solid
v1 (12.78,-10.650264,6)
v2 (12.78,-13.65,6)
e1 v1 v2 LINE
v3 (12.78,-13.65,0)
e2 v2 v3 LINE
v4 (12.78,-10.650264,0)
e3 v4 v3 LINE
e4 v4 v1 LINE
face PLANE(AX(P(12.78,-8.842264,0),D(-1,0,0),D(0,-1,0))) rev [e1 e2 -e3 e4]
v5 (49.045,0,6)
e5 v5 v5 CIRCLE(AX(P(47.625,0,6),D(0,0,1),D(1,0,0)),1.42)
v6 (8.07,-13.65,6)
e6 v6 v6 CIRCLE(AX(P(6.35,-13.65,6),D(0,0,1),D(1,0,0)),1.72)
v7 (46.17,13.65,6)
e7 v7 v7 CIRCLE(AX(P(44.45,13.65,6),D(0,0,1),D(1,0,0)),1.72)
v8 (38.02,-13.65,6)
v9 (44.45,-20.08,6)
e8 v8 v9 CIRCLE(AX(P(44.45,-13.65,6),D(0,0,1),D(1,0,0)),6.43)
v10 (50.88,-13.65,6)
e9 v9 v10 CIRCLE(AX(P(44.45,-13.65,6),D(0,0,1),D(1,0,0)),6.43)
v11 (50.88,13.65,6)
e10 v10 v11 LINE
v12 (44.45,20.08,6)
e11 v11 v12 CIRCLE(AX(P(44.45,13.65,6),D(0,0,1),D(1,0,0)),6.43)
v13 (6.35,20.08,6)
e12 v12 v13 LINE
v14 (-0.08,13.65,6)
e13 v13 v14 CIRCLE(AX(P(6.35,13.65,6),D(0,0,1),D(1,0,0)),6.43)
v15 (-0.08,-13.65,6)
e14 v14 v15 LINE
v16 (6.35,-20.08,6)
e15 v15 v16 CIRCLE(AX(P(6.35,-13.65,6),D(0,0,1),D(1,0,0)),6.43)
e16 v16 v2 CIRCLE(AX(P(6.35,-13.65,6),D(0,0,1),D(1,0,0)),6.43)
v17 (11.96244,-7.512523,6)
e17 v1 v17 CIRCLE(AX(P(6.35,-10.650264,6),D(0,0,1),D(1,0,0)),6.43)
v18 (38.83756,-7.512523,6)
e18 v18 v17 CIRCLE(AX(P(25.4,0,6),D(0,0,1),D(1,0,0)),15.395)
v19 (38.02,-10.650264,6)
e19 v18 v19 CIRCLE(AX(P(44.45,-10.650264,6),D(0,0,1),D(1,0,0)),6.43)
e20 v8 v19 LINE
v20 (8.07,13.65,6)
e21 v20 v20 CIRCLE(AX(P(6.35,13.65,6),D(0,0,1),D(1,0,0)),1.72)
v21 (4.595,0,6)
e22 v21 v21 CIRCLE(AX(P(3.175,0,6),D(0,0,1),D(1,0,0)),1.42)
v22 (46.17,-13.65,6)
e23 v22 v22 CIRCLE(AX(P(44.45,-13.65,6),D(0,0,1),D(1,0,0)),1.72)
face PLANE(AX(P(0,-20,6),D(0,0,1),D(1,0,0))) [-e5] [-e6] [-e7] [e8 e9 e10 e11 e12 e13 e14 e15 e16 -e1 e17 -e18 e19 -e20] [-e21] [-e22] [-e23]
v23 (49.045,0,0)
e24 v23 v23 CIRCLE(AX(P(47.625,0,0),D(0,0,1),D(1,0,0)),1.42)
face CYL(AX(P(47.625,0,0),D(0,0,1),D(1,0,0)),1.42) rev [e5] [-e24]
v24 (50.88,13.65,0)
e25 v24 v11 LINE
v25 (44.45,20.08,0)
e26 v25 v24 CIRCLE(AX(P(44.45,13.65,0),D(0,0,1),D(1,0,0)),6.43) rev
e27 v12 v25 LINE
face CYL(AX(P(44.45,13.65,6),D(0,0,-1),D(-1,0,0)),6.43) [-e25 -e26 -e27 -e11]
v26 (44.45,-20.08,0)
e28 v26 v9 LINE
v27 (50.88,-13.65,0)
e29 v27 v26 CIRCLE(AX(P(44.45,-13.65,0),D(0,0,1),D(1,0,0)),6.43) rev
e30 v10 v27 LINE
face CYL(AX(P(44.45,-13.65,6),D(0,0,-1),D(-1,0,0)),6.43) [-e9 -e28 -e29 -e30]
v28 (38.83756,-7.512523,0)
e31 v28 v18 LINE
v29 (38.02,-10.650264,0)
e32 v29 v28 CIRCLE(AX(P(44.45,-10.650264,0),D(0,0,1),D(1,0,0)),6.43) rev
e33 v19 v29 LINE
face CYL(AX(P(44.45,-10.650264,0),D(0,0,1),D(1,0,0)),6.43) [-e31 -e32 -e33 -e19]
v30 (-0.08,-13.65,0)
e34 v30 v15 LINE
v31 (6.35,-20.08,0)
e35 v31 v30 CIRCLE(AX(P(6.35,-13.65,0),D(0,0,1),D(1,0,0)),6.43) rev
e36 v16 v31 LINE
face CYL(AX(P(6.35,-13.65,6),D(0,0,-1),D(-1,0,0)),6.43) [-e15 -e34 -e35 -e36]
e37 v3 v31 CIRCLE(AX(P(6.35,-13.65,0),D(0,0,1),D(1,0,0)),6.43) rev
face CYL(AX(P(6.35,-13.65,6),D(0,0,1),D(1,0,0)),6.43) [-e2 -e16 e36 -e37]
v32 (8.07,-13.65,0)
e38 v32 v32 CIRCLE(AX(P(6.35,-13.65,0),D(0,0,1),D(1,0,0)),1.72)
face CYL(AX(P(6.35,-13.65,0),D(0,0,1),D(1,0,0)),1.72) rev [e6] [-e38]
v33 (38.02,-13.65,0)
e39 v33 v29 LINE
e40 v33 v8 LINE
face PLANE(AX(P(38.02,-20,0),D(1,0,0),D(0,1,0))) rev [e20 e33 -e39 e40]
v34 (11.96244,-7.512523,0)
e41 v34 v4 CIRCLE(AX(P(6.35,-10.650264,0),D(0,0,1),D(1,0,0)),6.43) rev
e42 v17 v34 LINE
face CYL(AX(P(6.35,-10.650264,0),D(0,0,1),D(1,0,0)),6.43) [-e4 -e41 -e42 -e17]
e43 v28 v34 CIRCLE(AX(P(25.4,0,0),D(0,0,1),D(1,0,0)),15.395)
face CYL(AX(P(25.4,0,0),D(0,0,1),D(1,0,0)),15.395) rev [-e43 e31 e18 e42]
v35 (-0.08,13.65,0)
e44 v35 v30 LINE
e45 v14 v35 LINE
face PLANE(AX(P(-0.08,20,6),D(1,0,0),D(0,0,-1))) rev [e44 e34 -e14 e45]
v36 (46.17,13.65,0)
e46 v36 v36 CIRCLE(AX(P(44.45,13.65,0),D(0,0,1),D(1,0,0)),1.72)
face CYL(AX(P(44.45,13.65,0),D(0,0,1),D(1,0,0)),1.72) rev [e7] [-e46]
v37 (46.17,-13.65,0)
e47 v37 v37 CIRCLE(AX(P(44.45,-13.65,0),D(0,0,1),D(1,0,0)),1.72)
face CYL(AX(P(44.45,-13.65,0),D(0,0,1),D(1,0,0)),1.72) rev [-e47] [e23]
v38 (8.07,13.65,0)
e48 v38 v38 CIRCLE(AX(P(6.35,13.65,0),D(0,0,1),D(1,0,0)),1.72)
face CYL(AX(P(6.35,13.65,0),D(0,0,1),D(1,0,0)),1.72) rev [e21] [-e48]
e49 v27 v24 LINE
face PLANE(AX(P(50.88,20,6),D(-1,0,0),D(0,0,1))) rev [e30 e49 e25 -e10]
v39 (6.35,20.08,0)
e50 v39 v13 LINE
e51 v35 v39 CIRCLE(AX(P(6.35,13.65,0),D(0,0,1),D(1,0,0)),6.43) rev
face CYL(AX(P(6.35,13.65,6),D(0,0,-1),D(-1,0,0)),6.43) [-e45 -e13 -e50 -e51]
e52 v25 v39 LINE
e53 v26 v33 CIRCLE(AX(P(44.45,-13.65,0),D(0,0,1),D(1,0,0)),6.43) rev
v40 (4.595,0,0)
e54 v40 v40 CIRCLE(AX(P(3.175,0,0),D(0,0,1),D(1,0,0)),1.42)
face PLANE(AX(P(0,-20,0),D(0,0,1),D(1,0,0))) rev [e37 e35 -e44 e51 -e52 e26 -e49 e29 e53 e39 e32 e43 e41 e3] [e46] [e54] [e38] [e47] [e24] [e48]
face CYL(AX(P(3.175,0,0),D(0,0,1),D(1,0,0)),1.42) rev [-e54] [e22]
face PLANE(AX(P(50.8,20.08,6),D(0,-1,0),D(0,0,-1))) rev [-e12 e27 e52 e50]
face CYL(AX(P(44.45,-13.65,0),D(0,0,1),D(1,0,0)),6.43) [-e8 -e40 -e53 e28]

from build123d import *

# Parameters (mm, degrees)
SKETCH1_W              = 50.8
SKETCH1_H              = 40
BOSS_EXTRUDE1_DEPTH    = 6
SKETCH10_R             = 1.8
M3_THROUGH_DEPTH       = 55.923947418
CUT_EXTRUDE2_DEPTH     = 55.923947418
FILLET1_R              = 6.35
SKETCH8_R              = 1.5
CUT_EXTRUDE1_DEPTH     = 55.923947418
MOVE_FACE1_OUTLINE_R   = 1.8
MOVE_FACE1_OUTLINE_R_2 = 1.72
MOVE_FACE1_OUTLINE_R_3 = 1.5
MOVE_FACE1_OUTLINE_R_4 = 1.42
MOVE_FACE1_DEPTH       = 6


# Read off the part's stored shape, not the designer's step: Move Face1
with BuildPart() as part:
    # Sketch1 → Boss-Extrude1 (new body)
    with BuildSketch(Plane.XY):
        with Locations((25.4, 0)):
            Rectangle(SKETCH1_W, SKETCH1_H)
    extrude(amount=BOSS_EXTRUDE1_DEPTH)

    # Sketch10 → M3-through (cut, through all)
    with BuildSketch(Plane.XY.offset(6)):
        with Locations((44.45, 13.65)):
            Circle(SKETCH10_R)
        with Locations(Location((44.45, -13.65, 0), (0, 0, 180))):
            Circle(SKETCH10_R)
        with Locations((6.35, -13.65)):
            Circle(SKETCH10_R)
        with Locations(Location((6.35, 13.65, 0), (0, 0, 180))):
            Circle(SKETCH10_R)
    extrude(amount=-M3_THROUGH_DEPTH, mode=Mode.SUBTRACT)

    # Sketch9 → Cut-Extrude2 (cut, through all)
    with BuildSketch(Plane.XY.offset(6)):
        with BuildLine():
            Line((12.7, -8.842263568), (12.7, -20))
            Line((12.7, -20), (38.1, -20))
            Line((38.1, -20), (38.1, -8.842263568))
            ThreePointArc((38.1, -8.842263568), (25.4, 15.475), (12.7, -8.842263568))
        make_face()
    extrude(amount=-CUT_EXTRUDE2_DEPTH, mode=Mode.SUBTRACT)

    # Fillet1
    fillet1_edges = [part.edges().sort_by_distance(p)[0] for p in [
        (0, -20, 3),
        (50.8, -20, 3),
        (50.8, 20, 3),
        (0, 20, 3),
        (38.1, -20, 3),
        (38.1, -8.842263568, 3),
        (12.7, -8.842263568, 3),
        (12.7, -20, 3),
    ]]
    fillet(fillet1_edges, radius=FILLET1_R - 0.0001)  # a hair under: the kernel refuses the full size

    # Sketch8 → Cut-Extrude1 (cut, through all)
    with BuildSketch(Plane.XY.offset(6)):
        with Locations((47.625, 0)):
            Circle(SKETCH8_R)
        with Locations((3.175, 0)):
            Circle(SKETCH8_R)
    extrude(amount=-CUT_EXTRUDE1_DEPTH, mode=Mode.SUBTRACT)

    # Move Face1 outline → Move Face1 (add)
    # profile 1 of 7: a face of its own
    with BuildSketch(Plane.XY):
        with BuildLine():
            Line((-0.08, 13.65), (-0.08, -13.65))
            ThreePointArc((-0.08, -13.65), (1.803303397, -18.196696603), (6.35, -20.08))
            ThreePointArc((6.35, -20.08), (10.896696603, -18.196696603), (12.78, -13.65))
            Line((12.78, -13.65), (12.78, -10.650264081))
            ThreePointArc((12.78, -10.650264081), (12.572253945, -9.029012761), (11.962439863, -7.512523048))
            ThreePointArc((11.962439863, -7.512523048), (25.4, 15.395), (38.837560137, -7.512523048))
            ThreePointArc((38.837560137, -7.512523048), (38.227746055, -9.029012761), (38.02, -10.650264081))
            Line((38.02, -10.650264081), (38.02, -13.65))
            ThreePointArc((38.02, -13.65), (39.903303397, -18.196696603), (44.45, -20.08))
            ThreePointArc((44.45, -20.08), (48.996696603, -18.196696603), (50.88, -13.65))
            Line((50.88, -13.65), (50.88, 13.65))
            ThreePointArc((50.88, 13.65), (48.996696603, 18.196696603), (44.45, 20.08))
            Line((44.45, 20.08), (6.35, 20.08))
            ThreePointArc((6.35, 20.08), (1.803303397, 18.196696603), (-0.08, 13.65))
        make_face()
        with BuildLine():
            ThreePointArc((6.35, -20), (1.859871939, -18.140128061), (0, -13.65))
            Line((0, -13.65), (0, 13.65))
            ThreePointArc((0, 13.65), (1.859871939, 18.140128061), (6.35, 20))
            Line((6.35, 20), (44.45, 20))
            ThreePointArc((44.45, 20), (48.940128061, 18.140128061), (50.8, 13.65))
            Line((50.8, 13.65), (50.8, -13.65))
            ThreePointArc((50.8, -13.65), (48.940128061, -18.140128061), (44.45, -20))
            ThreePointArc((44.45, -20), (39.959871939, -18.140128061), (38.1, -13.65))
            Line((38.1, -13.65), (38.1, -10.650264081))
            ThreePointArc((38.1, -10.650264081), (38.305161345, -9.049183851), (38.907388316, -7.551561817))
            ThreePointArc((38.907388316, -7.551561817), (25.4, 15.475), (11.892611684, -7.551561817))
            ThreePointArc((11.892611684, -7.551561817), (12.494838655, -9.049183851), (12.7, -10.650264081))
            Line((12.7, -10.650264081), (12.7, -13.65))
            ThreePointArc((12.7, -13.65), (10.840128061, -18.140128061), (6.35, -20))
        make_face(mode=Mode.SUBTRACT)
    # profile 2 of 7: a face of its own
    with BuildSketch(Plane.XY):
        with Locations((44.45, 13.65)):
            Circle(MOVE_FACE1_OUTLINE_R)
        with Locations((44.45, 13.65)):
            Circle(MOVE_FACE1_OUTLINE_R_2, mode=Mode.SUBTRACT)
    # profile 3 of 7: a face of its own
    with BuildSketch(Plane.XY):
        with Locations((44.45, -13.65)):
            Circle(MOVE_FACE1_OUTLINE_R)
        with Locations((44.45, -13.65)):
            Circle(MOVE_FACE1_OUTLINE_R_2, mode=Mode.SUBTRACT)
    # profile 4 of 7: a face of its own
    with BuildSketch(Plane.XY):
        with Locations((6.35, -13.65)):
            Circle(MOVE_FACE1_OUTLINE_R)
        with Locations((6.35, -13.65)):
            Circle(MOVE_FACE1_OUTLINE_R_2, mode=Mode.SUBTRACT)
    # profile 5 of 7: a face of its own
    with BuildSketch(Plane.XY):
        with Locations((6.35, 13.65)):
            Circle(MOVE_FACE1_OUTLINE_R)
        with Locations((6.35, 13.65)):
            Circle(MOVE_FACE1_OUTLINE_R_2, mode=Mode.SUBTRACT)
    # profile 6 of 7: a face of its own
    with BuildSketch(Plane.XY):
        with Locations((47.625, 0)):
            Circle(MOVE_FACE1_OUTLINE_R_3)
        with Locations((47.625, 0)):
            Circle(MOVE_FACE1_OUTLINE_R_4, mode=Mode.SUBTRACT)
    # profile 7 of 7: a face of its own
    with BuildSketch(Plane.XY):
        with Locations((3.175, 0)):
            Circle(MOVE_FACE1_OUTLINE_R_3)
        with Locations((3.175, 0)):
            Circle(MOVE_FACE1_OUTLINE_R_4, mode=Mode.SUBTRACT)
    extrude(amount=MOVE_FACE1_DEPTH)


solid = part.part
